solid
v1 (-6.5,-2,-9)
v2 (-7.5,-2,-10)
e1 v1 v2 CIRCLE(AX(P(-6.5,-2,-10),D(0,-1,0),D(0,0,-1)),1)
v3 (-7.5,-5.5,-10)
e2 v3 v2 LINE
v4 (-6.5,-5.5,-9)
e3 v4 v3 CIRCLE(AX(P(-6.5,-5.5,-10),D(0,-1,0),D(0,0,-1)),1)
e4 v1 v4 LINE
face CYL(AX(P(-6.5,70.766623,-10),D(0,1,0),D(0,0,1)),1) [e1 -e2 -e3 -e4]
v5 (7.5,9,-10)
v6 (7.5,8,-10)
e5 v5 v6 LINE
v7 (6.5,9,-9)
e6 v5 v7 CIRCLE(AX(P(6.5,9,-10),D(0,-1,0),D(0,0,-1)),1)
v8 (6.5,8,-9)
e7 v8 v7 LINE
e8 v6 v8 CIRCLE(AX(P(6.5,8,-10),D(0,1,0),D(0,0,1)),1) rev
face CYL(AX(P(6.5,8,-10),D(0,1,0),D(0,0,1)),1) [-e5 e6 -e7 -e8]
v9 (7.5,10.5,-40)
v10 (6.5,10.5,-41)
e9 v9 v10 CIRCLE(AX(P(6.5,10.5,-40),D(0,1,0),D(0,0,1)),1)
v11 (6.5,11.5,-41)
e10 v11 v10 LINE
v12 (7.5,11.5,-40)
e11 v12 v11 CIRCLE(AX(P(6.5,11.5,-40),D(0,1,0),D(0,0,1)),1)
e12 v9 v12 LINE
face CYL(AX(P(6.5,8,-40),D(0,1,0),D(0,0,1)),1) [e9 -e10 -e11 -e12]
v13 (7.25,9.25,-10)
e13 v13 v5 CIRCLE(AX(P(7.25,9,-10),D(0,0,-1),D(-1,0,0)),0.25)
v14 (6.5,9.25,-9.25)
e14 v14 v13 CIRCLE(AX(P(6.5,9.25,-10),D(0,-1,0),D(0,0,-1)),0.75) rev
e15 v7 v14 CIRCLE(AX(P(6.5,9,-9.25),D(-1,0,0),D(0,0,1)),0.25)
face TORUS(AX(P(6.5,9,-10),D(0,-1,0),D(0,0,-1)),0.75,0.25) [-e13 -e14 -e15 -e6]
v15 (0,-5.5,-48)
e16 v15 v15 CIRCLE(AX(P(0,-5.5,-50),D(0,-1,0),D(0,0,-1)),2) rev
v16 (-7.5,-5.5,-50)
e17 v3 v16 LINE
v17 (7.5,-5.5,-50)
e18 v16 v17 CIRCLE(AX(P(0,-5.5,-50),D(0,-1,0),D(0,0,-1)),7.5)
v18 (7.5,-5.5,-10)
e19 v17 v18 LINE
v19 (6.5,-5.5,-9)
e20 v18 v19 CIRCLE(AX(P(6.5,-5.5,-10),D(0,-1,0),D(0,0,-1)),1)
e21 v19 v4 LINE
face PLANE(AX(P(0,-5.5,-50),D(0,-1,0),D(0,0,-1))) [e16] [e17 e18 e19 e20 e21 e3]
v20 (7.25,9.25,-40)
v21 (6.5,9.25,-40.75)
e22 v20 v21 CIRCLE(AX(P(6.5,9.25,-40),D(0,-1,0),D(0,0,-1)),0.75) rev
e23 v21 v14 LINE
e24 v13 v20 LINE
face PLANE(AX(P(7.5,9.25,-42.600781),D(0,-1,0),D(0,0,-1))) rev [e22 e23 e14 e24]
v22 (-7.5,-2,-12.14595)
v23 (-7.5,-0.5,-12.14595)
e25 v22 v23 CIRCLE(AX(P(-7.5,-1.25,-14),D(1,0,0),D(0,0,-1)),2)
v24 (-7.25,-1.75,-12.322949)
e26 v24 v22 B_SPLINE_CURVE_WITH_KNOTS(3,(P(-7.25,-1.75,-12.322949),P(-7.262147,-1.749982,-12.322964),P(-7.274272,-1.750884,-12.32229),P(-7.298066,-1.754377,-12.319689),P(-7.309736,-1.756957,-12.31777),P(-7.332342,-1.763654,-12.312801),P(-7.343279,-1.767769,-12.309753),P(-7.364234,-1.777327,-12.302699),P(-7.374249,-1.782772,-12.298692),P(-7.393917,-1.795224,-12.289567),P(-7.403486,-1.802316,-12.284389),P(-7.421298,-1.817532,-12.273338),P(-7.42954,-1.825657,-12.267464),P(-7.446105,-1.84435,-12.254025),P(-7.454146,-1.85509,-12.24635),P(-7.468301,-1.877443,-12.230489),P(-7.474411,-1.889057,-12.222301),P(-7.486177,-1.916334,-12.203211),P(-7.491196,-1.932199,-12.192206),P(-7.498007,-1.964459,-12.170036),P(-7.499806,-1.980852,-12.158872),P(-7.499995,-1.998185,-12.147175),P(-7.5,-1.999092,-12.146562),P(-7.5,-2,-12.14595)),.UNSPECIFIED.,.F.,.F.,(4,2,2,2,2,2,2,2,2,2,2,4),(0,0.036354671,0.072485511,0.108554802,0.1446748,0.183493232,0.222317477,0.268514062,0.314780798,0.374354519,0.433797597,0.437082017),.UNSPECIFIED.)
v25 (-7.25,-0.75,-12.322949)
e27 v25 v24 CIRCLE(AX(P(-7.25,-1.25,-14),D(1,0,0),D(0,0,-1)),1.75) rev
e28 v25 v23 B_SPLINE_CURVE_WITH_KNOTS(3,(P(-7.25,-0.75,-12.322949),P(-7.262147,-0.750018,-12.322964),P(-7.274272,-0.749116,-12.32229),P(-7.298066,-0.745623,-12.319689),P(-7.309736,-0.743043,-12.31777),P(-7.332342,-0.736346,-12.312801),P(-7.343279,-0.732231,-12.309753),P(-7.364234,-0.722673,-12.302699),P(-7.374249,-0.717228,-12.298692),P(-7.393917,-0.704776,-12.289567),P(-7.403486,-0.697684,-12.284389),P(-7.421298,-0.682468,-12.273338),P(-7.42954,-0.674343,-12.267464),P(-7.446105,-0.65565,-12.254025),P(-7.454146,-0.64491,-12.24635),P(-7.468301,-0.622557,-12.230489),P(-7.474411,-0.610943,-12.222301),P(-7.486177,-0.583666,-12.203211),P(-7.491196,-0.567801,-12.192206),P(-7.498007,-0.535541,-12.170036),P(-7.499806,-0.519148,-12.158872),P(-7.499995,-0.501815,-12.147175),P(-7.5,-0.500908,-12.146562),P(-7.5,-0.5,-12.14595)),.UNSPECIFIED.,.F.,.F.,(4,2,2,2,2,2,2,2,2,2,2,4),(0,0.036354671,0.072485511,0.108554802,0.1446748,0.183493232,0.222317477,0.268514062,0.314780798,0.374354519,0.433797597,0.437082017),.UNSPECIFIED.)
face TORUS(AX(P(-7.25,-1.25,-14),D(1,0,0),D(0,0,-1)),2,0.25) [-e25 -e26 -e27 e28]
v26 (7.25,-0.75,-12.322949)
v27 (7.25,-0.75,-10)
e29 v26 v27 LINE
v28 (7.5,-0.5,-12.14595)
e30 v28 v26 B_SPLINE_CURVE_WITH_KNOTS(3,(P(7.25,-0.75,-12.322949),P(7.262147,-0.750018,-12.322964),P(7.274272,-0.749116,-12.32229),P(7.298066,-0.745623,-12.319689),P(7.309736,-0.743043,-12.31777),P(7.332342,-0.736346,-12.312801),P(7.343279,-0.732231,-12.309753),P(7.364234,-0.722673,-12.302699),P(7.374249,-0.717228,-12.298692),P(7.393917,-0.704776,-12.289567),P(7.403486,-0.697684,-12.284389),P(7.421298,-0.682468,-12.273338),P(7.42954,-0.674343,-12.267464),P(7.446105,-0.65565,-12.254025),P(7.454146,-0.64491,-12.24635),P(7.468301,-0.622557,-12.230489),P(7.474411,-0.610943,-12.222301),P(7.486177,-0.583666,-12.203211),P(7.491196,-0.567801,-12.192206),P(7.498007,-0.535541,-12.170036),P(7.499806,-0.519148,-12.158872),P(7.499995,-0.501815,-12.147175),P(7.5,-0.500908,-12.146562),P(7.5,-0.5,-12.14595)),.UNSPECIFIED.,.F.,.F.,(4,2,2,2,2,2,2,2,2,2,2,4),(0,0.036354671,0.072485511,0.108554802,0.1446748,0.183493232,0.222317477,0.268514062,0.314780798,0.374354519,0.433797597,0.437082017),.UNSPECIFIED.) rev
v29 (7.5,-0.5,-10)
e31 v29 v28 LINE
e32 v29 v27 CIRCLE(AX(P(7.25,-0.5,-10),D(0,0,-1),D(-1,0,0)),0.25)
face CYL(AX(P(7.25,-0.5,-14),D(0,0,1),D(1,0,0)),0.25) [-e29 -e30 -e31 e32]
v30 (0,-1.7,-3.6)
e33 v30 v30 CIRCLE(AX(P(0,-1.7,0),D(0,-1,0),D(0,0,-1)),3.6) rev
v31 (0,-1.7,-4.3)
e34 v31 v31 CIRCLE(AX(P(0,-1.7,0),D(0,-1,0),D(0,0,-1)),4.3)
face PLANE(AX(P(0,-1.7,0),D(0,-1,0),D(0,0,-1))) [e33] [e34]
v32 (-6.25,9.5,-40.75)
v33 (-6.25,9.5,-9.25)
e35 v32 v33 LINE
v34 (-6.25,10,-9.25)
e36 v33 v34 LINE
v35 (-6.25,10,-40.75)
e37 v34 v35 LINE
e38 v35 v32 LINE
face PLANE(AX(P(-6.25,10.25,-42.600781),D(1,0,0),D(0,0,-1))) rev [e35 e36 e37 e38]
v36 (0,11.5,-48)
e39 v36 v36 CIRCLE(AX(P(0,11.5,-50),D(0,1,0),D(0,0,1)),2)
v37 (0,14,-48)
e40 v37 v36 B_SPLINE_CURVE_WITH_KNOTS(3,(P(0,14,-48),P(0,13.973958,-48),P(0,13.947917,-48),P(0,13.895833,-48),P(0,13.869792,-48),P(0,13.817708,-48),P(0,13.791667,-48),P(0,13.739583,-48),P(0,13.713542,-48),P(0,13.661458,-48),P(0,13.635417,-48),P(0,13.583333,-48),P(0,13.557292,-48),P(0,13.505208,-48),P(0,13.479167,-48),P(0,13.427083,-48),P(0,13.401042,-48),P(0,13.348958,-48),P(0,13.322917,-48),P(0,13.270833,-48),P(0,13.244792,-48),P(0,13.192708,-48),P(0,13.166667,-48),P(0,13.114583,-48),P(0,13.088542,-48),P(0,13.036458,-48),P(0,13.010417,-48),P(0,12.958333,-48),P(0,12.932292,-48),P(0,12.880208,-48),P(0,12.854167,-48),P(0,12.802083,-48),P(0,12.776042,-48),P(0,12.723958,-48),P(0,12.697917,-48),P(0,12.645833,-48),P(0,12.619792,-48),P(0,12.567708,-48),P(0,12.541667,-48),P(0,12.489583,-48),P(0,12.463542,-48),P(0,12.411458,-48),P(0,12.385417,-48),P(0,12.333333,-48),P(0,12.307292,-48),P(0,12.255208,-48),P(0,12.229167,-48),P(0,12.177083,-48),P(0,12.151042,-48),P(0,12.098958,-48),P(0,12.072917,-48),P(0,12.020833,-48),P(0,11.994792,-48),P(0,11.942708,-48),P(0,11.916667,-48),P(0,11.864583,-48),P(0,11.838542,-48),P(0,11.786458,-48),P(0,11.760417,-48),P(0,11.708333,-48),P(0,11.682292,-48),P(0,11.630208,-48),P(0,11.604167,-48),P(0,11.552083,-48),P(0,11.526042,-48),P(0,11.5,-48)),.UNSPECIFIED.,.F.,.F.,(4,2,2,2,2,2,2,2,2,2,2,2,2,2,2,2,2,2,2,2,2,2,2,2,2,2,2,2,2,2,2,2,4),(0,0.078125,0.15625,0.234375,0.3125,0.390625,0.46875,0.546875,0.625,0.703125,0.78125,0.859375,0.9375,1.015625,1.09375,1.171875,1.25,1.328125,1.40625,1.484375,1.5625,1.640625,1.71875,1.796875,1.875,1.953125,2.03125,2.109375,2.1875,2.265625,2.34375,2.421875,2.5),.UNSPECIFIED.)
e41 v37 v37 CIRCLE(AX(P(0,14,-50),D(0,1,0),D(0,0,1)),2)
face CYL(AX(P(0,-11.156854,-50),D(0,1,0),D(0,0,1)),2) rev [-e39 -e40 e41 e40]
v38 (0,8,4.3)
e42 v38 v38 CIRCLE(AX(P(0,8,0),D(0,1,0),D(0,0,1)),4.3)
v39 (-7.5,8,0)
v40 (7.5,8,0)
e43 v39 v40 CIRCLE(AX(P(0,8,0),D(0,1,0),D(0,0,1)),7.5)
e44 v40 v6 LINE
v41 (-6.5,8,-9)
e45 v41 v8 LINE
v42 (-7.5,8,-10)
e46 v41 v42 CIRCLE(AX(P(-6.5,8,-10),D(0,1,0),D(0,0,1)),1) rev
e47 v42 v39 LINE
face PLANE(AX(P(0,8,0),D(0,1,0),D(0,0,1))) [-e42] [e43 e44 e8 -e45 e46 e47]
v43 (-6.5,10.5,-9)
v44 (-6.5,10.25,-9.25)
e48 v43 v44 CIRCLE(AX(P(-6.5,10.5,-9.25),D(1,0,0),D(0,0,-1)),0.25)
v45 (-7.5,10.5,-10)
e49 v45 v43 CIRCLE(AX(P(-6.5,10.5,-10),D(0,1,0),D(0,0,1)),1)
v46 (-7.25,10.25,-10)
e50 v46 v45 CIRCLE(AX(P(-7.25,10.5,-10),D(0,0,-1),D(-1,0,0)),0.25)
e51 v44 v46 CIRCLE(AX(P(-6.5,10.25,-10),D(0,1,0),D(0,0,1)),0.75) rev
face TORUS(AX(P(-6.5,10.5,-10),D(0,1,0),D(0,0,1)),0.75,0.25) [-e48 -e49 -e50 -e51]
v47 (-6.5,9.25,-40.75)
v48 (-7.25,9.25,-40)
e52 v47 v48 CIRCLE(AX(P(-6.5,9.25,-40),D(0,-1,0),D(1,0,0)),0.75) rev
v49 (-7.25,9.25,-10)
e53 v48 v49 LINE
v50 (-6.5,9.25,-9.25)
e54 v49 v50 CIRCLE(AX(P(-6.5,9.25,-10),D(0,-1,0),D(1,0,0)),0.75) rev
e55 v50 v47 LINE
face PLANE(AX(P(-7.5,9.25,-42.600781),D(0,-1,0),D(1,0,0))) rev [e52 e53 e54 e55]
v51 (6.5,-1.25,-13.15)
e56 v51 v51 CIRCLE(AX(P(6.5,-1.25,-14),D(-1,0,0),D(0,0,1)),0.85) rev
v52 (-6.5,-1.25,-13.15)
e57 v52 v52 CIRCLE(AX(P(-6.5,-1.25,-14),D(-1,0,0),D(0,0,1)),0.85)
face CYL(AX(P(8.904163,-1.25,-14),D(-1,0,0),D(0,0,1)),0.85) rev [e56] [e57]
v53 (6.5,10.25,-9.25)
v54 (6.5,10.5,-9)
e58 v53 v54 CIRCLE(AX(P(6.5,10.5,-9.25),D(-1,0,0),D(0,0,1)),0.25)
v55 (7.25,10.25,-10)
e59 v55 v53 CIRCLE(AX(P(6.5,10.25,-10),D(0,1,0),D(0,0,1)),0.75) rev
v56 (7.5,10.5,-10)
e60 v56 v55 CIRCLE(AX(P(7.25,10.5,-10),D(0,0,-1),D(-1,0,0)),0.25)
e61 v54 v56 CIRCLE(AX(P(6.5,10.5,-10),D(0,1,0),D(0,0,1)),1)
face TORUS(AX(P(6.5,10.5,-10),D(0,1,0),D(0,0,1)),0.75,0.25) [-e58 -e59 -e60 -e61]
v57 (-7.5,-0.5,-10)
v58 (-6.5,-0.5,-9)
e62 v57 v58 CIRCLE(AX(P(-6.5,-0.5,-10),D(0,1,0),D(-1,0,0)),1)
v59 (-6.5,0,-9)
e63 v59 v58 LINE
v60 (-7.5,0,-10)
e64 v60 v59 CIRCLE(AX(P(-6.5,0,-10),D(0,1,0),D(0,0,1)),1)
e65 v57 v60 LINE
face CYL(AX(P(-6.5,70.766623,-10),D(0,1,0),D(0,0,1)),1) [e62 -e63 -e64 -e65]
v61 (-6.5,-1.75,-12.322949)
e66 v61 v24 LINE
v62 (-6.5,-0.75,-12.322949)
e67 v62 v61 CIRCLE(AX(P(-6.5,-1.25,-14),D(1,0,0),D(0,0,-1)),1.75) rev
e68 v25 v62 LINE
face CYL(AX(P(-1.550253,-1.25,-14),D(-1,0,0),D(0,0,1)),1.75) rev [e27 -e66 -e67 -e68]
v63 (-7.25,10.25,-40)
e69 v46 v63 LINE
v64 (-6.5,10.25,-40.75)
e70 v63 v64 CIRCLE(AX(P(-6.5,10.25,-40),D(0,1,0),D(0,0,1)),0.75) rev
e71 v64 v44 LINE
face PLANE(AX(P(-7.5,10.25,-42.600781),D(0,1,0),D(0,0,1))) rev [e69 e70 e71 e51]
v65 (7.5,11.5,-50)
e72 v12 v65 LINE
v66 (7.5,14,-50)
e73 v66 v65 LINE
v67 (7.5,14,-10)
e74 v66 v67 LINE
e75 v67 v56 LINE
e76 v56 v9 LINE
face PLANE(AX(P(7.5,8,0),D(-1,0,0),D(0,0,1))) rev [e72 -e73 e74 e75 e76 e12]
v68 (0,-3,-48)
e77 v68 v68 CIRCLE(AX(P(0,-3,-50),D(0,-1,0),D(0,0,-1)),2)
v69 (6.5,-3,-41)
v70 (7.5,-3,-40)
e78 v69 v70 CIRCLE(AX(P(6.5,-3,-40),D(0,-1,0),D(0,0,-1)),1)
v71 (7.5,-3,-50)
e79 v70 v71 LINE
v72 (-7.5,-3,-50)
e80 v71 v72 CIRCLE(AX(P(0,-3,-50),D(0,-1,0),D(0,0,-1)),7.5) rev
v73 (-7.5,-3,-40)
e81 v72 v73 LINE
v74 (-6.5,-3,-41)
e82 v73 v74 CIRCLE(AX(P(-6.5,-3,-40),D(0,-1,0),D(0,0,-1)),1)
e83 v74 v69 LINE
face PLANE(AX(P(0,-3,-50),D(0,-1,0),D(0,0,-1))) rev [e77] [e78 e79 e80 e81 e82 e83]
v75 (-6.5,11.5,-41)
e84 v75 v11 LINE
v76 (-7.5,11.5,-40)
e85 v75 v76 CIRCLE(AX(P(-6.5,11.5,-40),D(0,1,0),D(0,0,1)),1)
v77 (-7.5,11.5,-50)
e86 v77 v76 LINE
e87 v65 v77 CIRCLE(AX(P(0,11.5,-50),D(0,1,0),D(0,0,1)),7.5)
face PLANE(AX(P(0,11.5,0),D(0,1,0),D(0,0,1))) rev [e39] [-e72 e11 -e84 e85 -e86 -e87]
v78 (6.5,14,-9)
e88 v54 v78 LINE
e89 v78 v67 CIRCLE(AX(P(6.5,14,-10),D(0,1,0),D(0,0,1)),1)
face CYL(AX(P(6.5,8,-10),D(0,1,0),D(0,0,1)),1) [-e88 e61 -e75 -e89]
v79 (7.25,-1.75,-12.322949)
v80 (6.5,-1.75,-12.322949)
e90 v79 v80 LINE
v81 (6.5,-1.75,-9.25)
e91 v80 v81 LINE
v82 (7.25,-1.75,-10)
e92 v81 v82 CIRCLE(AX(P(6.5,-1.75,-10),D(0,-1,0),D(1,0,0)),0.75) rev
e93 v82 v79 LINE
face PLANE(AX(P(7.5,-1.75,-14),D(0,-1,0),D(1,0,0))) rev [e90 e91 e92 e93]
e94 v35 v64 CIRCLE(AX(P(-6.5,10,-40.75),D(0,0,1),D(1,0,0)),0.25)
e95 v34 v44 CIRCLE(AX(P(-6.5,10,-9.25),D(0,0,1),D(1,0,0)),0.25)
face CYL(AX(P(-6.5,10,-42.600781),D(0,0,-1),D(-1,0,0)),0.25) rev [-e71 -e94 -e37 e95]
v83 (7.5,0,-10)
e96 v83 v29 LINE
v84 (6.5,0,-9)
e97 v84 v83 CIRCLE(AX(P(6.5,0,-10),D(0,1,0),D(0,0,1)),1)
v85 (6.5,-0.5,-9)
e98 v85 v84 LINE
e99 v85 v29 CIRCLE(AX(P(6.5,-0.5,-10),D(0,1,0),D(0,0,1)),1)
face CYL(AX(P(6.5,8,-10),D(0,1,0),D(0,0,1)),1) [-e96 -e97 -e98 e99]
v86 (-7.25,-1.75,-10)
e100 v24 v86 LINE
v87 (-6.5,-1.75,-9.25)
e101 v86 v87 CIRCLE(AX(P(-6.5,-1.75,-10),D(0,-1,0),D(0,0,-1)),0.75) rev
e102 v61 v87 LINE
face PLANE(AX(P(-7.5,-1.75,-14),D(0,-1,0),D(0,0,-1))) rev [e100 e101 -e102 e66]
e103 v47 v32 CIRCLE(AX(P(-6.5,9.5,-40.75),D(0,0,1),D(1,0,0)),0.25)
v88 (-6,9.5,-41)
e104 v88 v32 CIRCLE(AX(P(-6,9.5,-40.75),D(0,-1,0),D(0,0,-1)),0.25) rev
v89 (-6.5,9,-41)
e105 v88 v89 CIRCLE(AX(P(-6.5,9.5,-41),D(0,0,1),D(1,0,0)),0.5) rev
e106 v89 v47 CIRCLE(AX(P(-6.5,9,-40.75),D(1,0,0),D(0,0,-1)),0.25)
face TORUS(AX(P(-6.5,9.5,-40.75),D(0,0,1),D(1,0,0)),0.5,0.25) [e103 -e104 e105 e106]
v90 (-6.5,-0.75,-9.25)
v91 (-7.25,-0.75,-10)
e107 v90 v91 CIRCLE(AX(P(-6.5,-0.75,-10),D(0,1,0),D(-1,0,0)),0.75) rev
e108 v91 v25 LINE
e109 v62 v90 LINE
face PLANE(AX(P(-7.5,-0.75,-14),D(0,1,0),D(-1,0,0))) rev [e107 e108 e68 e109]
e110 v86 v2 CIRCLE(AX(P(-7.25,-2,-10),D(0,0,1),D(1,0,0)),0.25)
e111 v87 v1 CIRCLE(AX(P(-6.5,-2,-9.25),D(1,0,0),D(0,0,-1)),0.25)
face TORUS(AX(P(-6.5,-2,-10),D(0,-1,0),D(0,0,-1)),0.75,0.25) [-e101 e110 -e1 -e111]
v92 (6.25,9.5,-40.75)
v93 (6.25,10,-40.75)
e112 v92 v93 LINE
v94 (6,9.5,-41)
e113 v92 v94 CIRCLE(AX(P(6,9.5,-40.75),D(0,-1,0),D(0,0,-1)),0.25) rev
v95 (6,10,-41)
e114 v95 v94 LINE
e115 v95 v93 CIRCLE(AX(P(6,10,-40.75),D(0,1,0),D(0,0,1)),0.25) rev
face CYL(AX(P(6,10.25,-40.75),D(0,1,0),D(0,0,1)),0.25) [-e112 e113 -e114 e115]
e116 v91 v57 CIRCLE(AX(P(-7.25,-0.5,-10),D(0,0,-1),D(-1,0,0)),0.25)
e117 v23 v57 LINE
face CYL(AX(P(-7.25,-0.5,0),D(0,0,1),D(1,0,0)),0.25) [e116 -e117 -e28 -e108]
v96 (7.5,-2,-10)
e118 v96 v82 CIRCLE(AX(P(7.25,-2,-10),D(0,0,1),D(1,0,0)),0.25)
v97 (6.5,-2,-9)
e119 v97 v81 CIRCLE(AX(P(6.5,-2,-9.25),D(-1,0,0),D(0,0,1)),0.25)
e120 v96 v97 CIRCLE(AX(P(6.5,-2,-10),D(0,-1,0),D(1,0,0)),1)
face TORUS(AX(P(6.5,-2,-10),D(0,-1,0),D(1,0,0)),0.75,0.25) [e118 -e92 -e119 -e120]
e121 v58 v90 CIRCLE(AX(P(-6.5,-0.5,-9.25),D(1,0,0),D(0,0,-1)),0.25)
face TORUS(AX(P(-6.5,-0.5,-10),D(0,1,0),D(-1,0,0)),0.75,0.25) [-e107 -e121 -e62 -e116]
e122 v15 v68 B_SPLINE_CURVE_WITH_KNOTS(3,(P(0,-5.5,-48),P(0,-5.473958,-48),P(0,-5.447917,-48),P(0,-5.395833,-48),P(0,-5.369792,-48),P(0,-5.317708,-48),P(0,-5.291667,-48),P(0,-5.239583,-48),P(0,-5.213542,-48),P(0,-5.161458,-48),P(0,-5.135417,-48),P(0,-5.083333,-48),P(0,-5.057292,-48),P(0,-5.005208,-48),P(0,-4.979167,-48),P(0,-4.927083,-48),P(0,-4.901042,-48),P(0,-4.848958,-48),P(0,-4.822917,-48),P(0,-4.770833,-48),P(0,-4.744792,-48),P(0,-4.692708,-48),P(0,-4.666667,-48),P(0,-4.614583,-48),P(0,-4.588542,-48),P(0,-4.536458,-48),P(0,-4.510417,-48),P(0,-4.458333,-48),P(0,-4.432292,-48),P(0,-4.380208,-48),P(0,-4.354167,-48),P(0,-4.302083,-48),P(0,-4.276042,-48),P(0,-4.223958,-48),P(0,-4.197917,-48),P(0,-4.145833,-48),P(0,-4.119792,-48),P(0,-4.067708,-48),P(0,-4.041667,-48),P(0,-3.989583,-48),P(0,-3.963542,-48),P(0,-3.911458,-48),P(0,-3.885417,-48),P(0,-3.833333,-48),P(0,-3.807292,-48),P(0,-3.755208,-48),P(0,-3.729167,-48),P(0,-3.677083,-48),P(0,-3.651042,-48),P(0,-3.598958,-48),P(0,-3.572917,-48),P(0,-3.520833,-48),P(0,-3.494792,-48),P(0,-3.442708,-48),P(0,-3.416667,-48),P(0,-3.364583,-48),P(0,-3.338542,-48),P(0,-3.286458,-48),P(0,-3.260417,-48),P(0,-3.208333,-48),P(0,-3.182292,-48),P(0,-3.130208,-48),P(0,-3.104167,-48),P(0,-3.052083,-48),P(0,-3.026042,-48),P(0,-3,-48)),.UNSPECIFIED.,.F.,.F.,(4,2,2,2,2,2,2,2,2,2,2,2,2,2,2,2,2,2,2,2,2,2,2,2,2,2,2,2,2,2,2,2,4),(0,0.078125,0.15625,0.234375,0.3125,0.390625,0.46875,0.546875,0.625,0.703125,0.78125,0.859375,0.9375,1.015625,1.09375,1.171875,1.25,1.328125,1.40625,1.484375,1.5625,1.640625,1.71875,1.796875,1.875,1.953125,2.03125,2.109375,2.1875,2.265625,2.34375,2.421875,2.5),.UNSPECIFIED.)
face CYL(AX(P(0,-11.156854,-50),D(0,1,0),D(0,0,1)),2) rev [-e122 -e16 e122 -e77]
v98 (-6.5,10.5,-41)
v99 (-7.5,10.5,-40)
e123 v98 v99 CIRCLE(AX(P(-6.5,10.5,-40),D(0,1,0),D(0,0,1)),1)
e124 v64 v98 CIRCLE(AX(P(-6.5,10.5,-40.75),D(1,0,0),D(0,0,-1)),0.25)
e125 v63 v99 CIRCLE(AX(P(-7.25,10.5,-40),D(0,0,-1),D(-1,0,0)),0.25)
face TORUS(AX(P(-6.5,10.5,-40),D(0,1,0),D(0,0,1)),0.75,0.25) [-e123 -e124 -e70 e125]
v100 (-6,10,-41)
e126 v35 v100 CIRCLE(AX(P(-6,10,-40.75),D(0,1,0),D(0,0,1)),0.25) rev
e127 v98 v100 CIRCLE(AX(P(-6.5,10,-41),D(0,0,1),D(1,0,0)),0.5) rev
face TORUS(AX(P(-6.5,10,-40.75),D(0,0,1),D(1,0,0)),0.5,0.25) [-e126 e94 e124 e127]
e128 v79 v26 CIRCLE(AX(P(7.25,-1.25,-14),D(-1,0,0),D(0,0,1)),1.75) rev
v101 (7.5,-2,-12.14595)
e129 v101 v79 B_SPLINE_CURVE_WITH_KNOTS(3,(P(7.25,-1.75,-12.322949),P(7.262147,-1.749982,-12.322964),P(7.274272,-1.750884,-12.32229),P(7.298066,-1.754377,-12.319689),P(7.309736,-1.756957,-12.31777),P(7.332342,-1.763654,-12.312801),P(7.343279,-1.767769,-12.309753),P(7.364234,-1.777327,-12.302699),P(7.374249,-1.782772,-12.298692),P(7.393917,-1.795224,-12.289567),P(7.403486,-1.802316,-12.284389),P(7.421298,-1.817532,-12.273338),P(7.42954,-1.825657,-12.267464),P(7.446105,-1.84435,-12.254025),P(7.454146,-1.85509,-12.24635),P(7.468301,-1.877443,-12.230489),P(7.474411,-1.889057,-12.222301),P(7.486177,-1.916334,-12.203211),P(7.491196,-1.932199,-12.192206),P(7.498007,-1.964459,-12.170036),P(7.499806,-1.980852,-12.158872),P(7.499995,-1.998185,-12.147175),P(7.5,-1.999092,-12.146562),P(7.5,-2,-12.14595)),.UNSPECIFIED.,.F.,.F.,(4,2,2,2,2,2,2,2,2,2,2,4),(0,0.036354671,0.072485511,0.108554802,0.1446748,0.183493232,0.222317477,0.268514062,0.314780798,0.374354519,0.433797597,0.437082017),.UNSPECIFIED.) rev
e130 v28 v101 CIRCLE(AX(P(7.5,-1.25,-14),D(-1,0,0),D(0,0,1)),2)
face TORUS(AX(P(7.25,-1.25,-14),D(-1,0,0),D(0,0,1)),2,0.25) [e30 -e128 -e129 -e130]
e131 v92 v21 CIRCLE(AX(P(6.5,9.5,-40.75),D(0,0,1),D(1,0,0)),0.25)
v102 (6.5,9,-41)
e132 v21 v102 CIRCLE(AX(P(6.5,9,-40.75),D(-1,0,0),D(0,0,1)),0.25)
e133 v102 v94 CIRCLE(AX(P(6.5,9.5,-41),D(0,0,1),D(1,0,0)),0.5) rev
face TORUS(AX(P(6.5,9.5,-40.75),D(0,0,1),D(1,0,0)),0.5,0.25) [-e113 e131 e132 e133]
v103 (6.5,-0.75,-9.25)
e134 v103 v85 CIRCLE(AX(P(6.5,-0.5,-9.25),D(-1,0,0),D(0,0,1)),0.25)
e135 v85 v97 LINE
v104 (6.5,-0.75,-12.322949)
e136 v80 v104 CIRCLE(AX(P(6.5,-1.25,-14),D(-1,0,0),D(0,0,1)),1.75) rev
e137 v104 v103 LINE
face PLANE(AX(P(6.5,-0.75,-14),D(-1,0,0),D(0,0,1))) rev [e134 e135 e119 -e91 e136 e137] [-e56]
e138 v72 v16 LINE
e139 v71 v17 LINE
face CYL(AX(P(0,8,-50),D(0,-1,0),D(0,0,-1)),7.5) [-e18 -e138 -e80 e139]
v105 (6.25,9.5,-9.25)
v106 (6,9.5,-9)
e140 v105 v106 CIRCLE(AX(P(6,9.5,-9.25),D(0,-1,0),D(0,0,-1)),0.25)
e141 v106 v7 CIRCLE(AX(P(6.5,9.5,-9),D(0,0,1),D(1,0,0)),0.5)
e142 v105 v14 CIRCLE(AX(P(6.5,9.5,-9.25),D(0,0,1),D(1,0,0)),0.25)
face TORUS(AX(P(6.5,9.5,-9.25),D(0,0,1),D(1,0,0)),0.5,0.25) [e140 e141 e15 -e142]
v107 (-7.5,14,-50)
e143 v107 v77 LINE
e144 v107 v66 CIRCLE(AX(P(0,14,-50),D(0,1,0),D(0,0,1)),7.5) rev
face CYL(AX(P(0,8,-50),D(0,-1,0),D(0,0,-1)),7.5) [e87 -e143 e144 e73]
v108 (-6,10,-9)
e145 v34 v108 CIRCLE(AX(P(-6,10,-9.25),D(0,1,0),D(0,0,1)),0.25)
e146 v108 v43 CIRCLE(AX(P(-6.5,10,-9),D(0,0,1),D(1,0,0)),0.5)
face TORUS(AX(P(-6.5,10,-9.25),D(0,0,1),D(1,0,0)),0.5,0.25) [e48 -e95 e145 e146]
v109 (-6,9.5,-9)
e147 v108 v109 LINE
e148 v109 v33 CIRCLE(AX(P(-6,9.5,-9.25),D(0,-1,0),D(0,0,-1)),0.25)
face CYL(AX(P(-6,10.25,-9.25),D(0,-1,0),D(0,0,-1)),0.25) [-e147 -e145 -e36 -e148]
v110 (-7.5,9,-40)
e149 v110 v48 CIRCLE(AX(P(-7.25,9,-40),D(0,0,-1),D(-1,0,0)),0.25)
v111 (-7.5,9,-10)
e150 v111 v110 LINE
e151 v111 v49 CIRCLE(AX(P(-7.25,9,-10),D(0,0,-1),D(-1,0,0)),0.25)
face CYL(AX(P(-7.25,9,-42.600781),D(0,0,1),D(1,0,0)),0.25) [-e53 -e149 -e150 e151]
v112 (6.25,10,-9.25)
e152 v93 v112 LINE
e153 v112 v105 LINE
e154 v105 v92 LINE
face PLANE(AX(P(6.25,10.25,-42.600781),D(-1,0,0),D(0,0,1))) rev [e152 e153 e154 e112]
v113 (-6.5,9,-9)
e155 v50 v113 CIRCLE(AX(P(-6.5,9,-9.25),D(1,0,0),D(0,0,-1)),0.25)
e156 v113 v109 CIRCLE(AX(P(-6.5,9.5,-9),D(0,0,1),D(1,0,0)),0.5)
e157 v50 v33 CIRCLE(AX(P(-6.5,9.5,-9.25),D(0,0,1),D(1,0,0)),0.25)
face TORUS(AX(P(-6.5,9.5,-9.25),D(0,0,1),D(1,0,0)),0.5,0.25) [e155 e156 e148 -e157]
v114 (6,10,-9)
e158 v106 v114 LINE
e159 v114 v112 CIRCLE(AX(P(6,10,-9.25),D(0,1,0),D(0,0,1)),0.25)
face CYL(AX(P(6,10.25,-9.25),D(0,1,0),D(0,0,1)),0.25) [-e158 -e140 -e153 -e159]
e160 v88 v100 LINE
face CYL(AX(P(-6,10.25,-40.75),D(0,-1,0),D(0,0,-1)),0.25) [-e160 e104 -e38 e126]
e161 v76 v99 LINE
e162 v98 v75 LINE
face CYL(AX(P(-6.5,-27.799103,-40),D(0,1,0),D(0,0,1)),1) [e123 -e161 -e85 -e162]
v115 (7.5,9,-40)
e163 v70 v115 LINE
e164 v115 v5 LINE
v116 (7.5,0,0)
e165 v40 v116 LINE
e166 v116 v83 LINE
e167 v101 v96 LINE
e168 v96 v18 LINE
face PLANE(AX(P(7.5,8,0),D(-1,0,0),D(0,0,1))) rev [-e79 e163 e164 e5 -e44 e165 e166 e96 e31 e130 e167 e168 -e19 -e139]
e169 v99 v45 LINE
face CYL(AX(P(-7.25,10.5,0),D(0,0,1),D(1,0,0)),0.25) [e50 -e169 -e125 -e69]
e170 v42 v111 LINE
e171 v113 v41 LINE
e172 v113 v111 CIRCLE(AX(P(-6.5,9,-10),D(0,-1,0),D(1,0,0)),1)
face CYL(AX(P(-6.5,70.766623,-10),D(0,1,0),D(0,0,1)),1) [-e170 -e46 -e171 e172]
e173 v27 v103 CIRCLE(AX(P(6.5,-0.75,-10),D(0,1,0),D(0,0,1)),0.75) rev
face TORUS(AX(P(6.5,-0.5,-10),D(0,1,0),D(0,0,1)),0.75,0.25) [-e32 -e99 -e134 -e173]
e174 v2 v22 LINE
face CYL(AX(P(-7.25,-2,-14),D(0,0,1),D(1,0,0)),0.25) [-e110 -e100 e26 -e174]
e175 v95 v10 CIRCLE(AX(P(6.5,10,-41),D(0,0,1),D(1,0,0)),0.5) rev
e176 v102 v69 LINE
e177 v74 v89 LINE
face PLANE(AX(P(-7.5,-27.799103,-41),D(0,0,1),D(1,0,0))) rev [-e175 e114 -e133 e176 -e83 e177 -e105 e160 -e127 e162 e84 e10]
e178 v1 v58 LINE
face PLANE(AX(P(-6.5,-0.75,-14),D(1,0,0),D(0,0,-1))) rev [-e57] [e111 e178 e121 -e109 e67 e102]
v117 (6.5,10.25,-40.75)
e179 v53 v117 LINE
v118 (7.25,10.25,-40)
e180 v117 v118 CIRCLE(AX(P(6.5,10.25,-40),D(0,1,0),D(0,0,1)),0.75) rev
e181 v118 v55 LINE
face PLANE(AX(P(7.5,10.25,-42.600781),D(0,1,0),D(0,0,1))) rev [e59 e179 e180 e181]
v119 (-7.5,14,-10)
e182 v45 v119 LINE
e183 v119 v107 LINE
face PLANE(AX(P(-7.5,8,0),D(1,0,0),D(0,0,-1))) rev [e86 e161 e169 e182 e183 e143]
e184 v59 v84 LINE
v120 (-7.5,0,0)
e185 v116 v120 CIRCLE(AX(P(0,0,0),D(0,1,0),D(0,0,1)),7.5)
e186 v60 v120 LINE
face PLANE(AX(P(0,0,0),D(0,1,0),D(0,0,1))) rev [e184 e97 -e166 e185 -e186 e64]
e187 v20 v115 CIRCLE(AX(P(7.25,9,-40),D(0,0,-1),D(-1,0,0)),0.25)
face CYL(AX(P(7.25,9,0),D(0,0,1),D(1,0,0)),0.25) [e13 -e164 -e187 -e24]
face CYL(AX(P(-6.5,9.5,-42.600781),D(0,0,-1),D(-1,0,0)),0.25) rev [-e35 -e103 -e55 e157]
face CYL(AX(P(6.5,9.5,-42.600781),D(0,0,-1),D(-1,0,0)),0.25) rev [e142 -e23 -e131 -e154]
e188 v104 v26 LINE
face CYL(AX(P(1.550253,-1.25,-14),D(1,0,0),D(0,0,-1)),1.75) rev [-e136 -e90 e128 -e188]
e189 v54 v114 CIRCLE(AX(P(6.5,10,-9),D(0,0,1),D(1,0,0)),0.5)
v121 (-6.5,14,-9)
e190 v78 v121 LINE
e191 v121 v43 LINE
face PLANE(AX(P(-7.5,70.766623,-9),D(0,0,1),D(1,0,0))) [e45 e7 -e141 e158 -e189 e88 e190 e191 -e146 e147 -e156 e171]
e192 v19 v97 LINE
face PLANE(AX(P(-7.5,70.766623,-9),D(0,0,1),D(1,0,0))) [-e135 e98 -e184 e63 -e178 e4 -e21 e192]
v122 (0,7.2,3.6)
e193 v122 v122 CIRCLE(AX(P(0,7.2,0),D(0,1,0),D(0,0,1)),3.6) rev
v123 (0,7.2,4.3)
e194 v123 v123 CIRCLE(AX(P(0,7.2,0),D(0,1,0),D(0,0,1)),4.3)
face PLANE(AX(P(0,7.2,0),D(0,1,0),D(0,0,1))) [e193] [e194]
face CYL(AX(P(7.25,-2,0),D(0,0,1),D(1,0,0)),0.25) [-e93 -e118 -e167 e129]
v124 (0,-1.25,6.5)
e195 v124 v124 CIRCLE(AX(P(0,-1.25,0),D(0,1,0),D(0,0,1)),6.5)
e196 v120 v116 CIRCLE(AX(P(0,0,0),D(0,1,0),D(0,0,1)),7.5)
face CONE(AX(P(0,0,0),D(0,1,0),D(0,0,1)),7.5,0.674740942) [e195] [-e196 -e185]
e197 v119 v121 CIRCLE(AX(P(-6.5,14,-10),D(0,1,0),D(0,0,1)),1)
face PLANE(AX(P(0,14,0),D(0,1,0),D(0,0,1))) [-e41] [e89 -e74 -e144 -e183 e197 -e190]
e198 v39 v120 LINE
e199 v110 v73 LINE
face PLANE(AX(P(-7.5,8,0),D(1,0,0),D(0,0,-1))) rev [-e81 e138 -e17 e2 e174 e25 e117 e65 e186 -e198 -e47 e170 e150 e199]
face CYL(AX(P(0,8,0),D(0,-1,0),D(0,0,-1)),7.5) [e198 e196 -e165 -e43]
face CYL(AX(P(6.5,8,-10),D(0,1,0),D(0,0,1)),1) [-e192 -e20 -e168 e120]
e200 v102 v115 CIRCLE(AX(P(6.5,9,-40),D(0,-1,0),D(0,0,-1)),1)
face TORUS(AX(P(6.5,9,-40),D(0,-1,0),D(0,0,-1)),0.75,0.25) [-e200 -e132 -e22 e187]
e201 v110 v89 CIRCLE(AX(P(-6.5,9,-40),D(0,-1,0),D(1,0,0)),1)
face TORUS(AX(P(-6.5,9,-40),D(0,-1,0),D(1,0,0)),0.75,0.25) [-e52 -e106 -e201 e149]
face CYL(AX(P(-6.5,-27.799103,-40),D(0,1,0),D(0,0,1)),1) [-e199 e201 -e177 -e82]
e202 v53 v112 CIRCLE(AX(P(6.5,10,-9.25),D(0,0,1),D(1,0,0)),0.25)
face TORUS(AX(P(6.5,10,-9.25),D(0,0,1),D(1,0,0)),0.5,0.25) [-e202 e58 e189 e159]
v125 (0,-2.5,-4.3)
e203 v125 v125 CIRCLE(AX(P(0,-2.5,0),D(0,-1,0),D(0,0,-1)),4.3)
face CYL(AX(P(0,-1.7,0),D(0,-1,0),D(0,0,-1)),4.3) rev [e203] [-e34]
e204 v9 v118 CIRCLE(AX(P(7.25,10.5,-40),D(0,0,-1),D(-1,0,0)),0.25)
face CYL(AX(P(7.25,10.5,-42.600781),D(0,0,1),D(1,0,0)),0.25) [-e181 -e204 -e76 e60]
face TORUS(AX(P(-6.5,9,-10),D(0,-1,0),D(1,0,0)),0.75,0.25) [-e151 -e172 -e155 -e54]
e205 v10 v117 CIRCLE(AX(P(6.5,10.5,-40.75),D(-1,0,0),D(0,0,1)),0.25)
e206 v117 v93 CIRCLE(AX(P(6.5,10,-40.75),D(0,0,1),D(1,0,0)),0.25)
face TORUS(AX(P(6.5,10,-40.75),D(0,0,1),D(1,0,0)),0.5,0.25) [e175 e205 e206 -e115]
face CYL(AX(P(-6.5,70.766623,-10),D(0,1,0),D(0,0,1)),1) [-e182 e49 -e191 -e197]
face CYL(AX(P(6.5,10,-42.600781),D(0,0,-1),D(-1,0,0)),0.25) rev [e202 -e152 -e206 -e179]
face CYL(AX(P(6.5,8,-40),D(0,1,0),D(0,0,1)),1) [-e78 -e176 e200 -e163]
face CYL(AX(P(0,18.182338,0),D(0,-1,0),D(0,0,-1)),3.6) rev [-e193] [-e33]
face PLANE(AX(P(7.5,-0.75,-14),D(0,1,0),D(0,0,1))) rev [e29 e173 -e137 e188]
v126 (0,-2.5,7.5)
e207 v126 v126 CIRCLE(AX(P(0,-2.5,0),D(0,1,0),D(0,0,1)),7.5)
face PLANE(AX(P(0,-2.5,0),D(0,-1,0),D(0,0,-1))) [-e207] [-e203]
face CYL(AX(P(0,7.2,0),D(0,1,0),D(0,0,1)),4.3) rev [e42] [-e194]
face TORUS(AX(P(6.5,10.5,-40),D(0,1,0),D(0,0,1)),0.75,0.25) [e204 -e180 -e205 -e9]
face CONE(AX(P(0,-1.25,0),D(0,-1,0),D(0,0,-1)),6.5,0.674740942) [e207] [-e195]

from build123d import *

# Parameters (mm, degrees)
EXTRUDE_1_DEPTH          = 8
EXTRUDE_2_DEPTH          = 5.5
EXTRUDE_2_DEPTH_BACK     = 14
CUT_EXTRUDE_1_DEPTH      = 11.5
CUT_EXTRUDE_1_DEPTH_BACK = 3
FILLET_1_R               = 1
SKETCH_5_W               = 1
SKETCH_5_H               = 1
CUT_EXTRUDE_2_DEPTH      = 5
CUT_EXTRUDE_3_REACH      = 63.051
SKETCH_6_R               = 0.5
SKETCH_7_R               = 1.75
CUT_EXTRUDE_4_DEPTH      = 1
CUT_EXTRUDE_START        = -1
SKETCH_8_R               = 1.75
CUT_EXTRUDE_5_DEPTH      = 1
CUT_EXTRUDE_6_REACH      = 53.034
SKETCH_9_W               = 1.25
SKETCH_9_H               = 1
FILLET_2_R               = 0.25
SKETCH_10_R              = 2
CUT_EXTRUDE_7_DEPTH      = 10.5
CUT_EXTRUDE_8_REACH      = 63.178
SKETCH_11_R              = 2
SKETCH_12_R              = 3.6
CUT_EXTRUDE_9_DEPTH      = 10.5
SKETCH_13_R              = 4.3
CUT_EXTRUDE_10_DEPTH     = 0.8
CUT_EXTRUDE_START_2      = -0.8
SKETCH_14_R              = 4.3
CUT_EXTRUDE_11_DEPTH     = 0.8
SKETCH_15_R              = 0.85
CUT_EXTRUDE_12_DEPTH     = 13


with BuildPart() as part:
    # 스케치1 → 보스-돌출1 (new body)
    with BuildSketch(Plane(origin=(0, 0, 0), x_dir=(1, 0, 0), z_dir=(0, 1, 0))):
        with BuildLine():
            Line((-7.5, 0), (-7.5, 50))
            ThreePointArc((-7.5, 50), (0, 57.5), (7.5, 50))
            Line((7.5, 50), (7.5, 0))
            ThreePointArc((7.5, 0), (0, -7.5), (-7.5, 0))
        make_face()
    extrude(amount=EXTRUDE_1_DEPTH)

    # 스케치2 → 회전1 (revolve)
    with BuildSketch(Plane.XY, mode=Mode.PRIVATE) as revolve_1_sk:
        Polygon((0, 0), (0, -2.5), (-7.5, -2.5), (-6.5, -1.25), (-7.5, 0), align=None)
    revolve(revolve_1_sk.sketch.rotate(Axis((0, 0, 0), (0, -1, 0)), 270), axis=Axis((0, 0, 0), (0, -1, 0)))

    # 스케치3 → 보스-돌출2 (add, two sides: drawn at the far end of the back side and taken through both)
    with BuildSketch(Plane.XZ.offset(-EXTRUDE_2_DEPTH_BACK)):
        with BuildLine():
            Line((7.5, -50), (7.5, -9))
            Line((7.5, -9), (-7.5, -9))
            Line((-7.5, -9), (-7.5, -50))
            ThreePointArc((-7.5, -50), (0, -57.5), (7.5, -50))
        make_face()
    extrude(amount=EXTRUDE_2_DEPTH + EXTRUDE_2_DEPTH_BACK)

    # 스케치4 → 컷-돌출1 (cut, two sides: drawn at the far end of the back side and taken through both)
    with BuildSketch(Plane(origin=(0, 0, 0), x_dir=(1, 0, 0), z_dir=(0, 1, 0)).offset(-CUT_EXTRUDE_1_DEPTH_BACK)):
        with BuildLine():
            Line((-7.5, 50), (-7.5, 41))
            Line((-7.5, 41), (7.5, 41))
            Line((7.5, 41), (7.5, 50))
            ThreePointArc((7.5, 50), (0, 57.5), (-7.5, 50))
        make_face()
    extrude(amount=CUT_EXTRUDE_1_DEPTH + CUT_EXTRUDE_1_DEPTH_BACK, mode=Mode.SUBTRACT)

    # 필렛1
    fillet_1_edges = [part.edges().sort_by_distance(p)[0] for p in [
        (7.5, -2.75, -9),
        (-7.5, -2.75, -9),
        (7.5, 11, -9),
        (-7.5, 11, -9),
        (-7.5, 4.25, -41),
        (7.5, 4.25, -41),
    ]]
    fillet(fillet_1_edges, radius=FILLET_1_R)

    # 스케치5 → 컷-돌출2 (cut)
    with BuildSketch(Plane.XY.offset(-9)):
        with Locations((-7, -1.25)):
            Rectangle(SKETCH_5_W, SKETCH_5_H)
        with Locations((7, -1.25)):
            Rectangle(SKETCH_5_W, SKETCH_5_H)
    extrude(amount=-CUT_EXTRUDE_2_DEPTH, mode=Mode.SUBTRACT)

    # 컷-돌출3: up to this face of the body (flat: up to its plane)
    cut_extrude_3_end = Plane(part.part.faces().sort_by_distance((-7.5, 4.25281294, -24.229254571))[0])
    # 스케치6 → 컷-돌출3 (cut, up to the picked face)
    with BuildSketch(Plane(origin=(7.5, 0, 0), x_dir=(0, 0, -1), z_dir=(1, 0, 0)), mode=Mode.PRIVATE) as cut_extrude_3_sk1:
        with Locations(Location((14, -1.25, 0), (0, 0, 90))):
            Circle(SKETCH_6_R)
    cut_extrude_3_tool1 = split(extrude(cut_extrude_3_sk1.sketch, amount=-CUT_EXTRUDE_3_REACH, mode=Mode.PRIVATE), bisect_by=cut_extrude_3_end, keep=Keep.BOTH, mode=Mode.PRIVATE)
    add(cut_extrude_3_tool1.solids().sort_by(Axis((7.5, -1.25, -14), (-1, 0, 0)))[0], mode=Mode.SUBTRACT)

    # 스케치7 → 컷-돌출4 (cut)
    with BuildSketch(Plane(origin=(7.5, 0, 0), x_dir=(0, 0, -1), z_dir=(1, 0, 0))):
        with Locations((14, -1.25)):
            Circle(SKETCH_7_R)
    extrude(amount=-CUT_EXTRUDE_4_DEPTH, mode=Mode.SUBTRACT)

    # 스케치8 → 컷-돌출5 (cut)
    with BuildSketch(Plane.ZY.offset(7.5).offset(CUT_EXTRUDE_START)):
        with Locations((-14, -1.25)):
            Circle(SKETCH_8_R)
    extrude(amount=CUT_EXTRUDE_5_DEPTH, mode=Mode.SUBTRACT)

    # 컷-돌출6: up to this face of the body (flat: up to its plane)
    cut_extrude_6_end = Plane(part.part.faces().sort_by_distance((0, 4.25, -41))[0])
    # 스케치9 → 컷-돌출6 (cut, up to the picked face)
    with BuildSketch(Plane.XY.offset(-9), mode=Mode.PRIVATE) as cut_extrude_6_sk1:
        with Locations((6.875, 9.75)):
            Rectangle(SKETCH_9_W, SKETCH_9_H)
    cut_extrude_6_tool1 = split(extrude(cut_extrude_6_sk1.sketch, amount=-CUT_EXTRUDE_6_REACH, mode=Mode.PRIVATE), bisect_by=cut_extrude_6_end, keep=Keep.BOTH, mode=Mode.PRIVATE)
    # 스케치9 → 컷-돌출6 (cut, up to the picked face)
    with BuildSketch(Plane.XY.offset(-9), mode=Mode.PRIVATE) as cut_extrude_6_sk2:
        with Locations((-6.875, 9.75)):
            Rectangle(SKETCH_9_W, SKETCH_9_H)
    cut_extrude_6_tool2 = split(extrude(cut_extrude_6_sk2.sketch, amount=-CUT_EXTRUDE_6_REACH, mode=Mode.PRIVATE), bisect_by=cut_extrude_6_end, keep=Keep.BOTH, mode=Mode.PRIVATE)
    add(cut_extrude_6_tool1.solids().sort_by(Axis((6.875, 9.75, -9), (0, 0, -1)))[0], mode=Mode.SUBTRACT)
    add(cut_extrude_6_tool2.solids().sort_by(Axis((-6.875, 9.75, -9), (0, 0, -1)))[0], mode=Mode.SUBTRACT)

    # 필렛2
    fillet_2_edges = [part.edges().sort_by_distance(p)[0] for p in [
        (7.207106781, 9.25, -40.707106781),
        (7.207106781, 9.25, -9.292893219),
        (7.207106781, 10.25, -40.707106781),
        (7.207106781, 10.25, -9.292893219),
        (7.207106781, -1.75, -9.292893219),
        (7.207106781, -0.75, -9.292893219),
        (-7.207106781, 10.25, -40.707106781),
        (-7.207106781, 10.25, -9.292893219),
        (-7.207106781, 9.25, -40.707106781),
        (-7.207106781, 9.25, -9.292893219),
        (-7.207106781, -1.75, -9.292893219),
        (-7.207106781, -0.75, -9.292893219),
        (7.5, 9.25, -25),
        (7.5, 10.25, -25),
        (7.5, -1.25, -15.75),
        (7.5, -1.75, -11.161474508),
        (7.5, -0.75, -11.161474508),
        (-7.5, 10.25, -25),
        (-7.5, 9.25, -25),
        (-7.5, -1.25, -15.75),
        (-7.5, -1.75, -11.161474508),
        (-7.5, -0.75, -11.161474508),
        (6.25, 9.75, -41),
        (6.25, 9.75, -9),
        (-6.25, 9.75, -41),
        (-6.25, 9.75, -9),
        (-6.25, 9.25, -25),
        (6.25, 10.25, -25),
        (6.25, 9.25, -25),
        (-6.25, 10.25, -25),
    ]]
    fillet(fillet_2_edges, radius=FILLET_2_R - 0.0001)  # a hair under: the kernel refuses the full size

    # 스케치10 → 컷-돌출7 (cut)
    with BuildSketch(Plane.XZ.offset(2.5)):
        with Locations(Location((0, 0, 0), (0, 0, 270))):
            Circle(SKETCH_10_R)
    extrude(amount=-CUT_EXTRUDE_7_DEPTH, mode=Mode.SUBTRACT)

    # 컷-돌출8: up to this face of the body (flat: up to its plane)
    cut_extrude_8_end = Plane(part.part.faces().sort_by_distance((0, -5.5, -32.489320458))[0])
    # 스케치11 → 컷-돌출8 (cut, up to the picked face)
    with BuildSketch(Plane(origin=(0, 14, 0), x_dir=(1, 0, 0), z_dir=(0, 1, 0)), mode=Mode.PRIVATE) as cut_extrude_8_sk1:
        with Locations(Location((0, 50, 0), (0, 0, 270))):
            Circle(SKETCH_11_R)
    cut_extrude_8_tool1 = split(extrude(cut_extrude_8_sk1.sketch, amount=-CUT_EXTRUDE_8_REACH, mode=Mode.PRIVATE), bisect_by=cut_extrude_8_end, keep=Keep.BOTH, mode=Mode.PRIVATE)
    add(cut_extrude_8_tool1.solids().sort_by(Axis((0, 14, -50), (0, -1, 0)))[0], mode=Mode.SUBTRACT)

    # 스케치12 → 컷-돌출9 (cut)
    with BuildSketch(Plane.XZ.offset(2.5)):
        with Locations(Location((0, 0, 0), (0, 0, 270))):
            Circle(SKETCH_12_R)
    extrude(amount=-CUT_EXTRUDE_9_DEPTH, mode=Mode.SUBTRACT)

    # 스케치13 → 컷-돌출10 (cut)
    with BuildSketch(Plane.XZ.offset(2.5)):
        with Locations(Location((0, 0, 0), (0, 0, 270))):
            Circle(SKETCH_13_R)
    extrude(amount=-CUT_EXTRUDE_10_DEPTH, mode=Mode.SUBTRACT)

    # 스케치14 → 컷-돌출11 (cut)
    with BuildSketch(Plane(origin=(0, 8, 0), x_dir=(1, 0, 0), z_dir=(0, 1, 0)).offset(CUT_EXTRUDE_START_2)):
        with Locations(Location((0, 0, 0), (0, 0, 90))):
            Circle(SKETCH_14_R)
    extrude(amount=CUT_EXTRUDE_11_DEPTH, mode=Mode.SUBTRACT)

    # 스케치15 → 컷-돌출12 (cut)
    with BuildSketch(Plane.ZY.offset(6.5)):
        with Locations((-14, -1.25)):
            Circle(SKETCH_15_R)
    extrude(amount=-CUT_EXTRUDE_12_DEPTH, mode=Mode.SUBTRACT)


solid = part.part
